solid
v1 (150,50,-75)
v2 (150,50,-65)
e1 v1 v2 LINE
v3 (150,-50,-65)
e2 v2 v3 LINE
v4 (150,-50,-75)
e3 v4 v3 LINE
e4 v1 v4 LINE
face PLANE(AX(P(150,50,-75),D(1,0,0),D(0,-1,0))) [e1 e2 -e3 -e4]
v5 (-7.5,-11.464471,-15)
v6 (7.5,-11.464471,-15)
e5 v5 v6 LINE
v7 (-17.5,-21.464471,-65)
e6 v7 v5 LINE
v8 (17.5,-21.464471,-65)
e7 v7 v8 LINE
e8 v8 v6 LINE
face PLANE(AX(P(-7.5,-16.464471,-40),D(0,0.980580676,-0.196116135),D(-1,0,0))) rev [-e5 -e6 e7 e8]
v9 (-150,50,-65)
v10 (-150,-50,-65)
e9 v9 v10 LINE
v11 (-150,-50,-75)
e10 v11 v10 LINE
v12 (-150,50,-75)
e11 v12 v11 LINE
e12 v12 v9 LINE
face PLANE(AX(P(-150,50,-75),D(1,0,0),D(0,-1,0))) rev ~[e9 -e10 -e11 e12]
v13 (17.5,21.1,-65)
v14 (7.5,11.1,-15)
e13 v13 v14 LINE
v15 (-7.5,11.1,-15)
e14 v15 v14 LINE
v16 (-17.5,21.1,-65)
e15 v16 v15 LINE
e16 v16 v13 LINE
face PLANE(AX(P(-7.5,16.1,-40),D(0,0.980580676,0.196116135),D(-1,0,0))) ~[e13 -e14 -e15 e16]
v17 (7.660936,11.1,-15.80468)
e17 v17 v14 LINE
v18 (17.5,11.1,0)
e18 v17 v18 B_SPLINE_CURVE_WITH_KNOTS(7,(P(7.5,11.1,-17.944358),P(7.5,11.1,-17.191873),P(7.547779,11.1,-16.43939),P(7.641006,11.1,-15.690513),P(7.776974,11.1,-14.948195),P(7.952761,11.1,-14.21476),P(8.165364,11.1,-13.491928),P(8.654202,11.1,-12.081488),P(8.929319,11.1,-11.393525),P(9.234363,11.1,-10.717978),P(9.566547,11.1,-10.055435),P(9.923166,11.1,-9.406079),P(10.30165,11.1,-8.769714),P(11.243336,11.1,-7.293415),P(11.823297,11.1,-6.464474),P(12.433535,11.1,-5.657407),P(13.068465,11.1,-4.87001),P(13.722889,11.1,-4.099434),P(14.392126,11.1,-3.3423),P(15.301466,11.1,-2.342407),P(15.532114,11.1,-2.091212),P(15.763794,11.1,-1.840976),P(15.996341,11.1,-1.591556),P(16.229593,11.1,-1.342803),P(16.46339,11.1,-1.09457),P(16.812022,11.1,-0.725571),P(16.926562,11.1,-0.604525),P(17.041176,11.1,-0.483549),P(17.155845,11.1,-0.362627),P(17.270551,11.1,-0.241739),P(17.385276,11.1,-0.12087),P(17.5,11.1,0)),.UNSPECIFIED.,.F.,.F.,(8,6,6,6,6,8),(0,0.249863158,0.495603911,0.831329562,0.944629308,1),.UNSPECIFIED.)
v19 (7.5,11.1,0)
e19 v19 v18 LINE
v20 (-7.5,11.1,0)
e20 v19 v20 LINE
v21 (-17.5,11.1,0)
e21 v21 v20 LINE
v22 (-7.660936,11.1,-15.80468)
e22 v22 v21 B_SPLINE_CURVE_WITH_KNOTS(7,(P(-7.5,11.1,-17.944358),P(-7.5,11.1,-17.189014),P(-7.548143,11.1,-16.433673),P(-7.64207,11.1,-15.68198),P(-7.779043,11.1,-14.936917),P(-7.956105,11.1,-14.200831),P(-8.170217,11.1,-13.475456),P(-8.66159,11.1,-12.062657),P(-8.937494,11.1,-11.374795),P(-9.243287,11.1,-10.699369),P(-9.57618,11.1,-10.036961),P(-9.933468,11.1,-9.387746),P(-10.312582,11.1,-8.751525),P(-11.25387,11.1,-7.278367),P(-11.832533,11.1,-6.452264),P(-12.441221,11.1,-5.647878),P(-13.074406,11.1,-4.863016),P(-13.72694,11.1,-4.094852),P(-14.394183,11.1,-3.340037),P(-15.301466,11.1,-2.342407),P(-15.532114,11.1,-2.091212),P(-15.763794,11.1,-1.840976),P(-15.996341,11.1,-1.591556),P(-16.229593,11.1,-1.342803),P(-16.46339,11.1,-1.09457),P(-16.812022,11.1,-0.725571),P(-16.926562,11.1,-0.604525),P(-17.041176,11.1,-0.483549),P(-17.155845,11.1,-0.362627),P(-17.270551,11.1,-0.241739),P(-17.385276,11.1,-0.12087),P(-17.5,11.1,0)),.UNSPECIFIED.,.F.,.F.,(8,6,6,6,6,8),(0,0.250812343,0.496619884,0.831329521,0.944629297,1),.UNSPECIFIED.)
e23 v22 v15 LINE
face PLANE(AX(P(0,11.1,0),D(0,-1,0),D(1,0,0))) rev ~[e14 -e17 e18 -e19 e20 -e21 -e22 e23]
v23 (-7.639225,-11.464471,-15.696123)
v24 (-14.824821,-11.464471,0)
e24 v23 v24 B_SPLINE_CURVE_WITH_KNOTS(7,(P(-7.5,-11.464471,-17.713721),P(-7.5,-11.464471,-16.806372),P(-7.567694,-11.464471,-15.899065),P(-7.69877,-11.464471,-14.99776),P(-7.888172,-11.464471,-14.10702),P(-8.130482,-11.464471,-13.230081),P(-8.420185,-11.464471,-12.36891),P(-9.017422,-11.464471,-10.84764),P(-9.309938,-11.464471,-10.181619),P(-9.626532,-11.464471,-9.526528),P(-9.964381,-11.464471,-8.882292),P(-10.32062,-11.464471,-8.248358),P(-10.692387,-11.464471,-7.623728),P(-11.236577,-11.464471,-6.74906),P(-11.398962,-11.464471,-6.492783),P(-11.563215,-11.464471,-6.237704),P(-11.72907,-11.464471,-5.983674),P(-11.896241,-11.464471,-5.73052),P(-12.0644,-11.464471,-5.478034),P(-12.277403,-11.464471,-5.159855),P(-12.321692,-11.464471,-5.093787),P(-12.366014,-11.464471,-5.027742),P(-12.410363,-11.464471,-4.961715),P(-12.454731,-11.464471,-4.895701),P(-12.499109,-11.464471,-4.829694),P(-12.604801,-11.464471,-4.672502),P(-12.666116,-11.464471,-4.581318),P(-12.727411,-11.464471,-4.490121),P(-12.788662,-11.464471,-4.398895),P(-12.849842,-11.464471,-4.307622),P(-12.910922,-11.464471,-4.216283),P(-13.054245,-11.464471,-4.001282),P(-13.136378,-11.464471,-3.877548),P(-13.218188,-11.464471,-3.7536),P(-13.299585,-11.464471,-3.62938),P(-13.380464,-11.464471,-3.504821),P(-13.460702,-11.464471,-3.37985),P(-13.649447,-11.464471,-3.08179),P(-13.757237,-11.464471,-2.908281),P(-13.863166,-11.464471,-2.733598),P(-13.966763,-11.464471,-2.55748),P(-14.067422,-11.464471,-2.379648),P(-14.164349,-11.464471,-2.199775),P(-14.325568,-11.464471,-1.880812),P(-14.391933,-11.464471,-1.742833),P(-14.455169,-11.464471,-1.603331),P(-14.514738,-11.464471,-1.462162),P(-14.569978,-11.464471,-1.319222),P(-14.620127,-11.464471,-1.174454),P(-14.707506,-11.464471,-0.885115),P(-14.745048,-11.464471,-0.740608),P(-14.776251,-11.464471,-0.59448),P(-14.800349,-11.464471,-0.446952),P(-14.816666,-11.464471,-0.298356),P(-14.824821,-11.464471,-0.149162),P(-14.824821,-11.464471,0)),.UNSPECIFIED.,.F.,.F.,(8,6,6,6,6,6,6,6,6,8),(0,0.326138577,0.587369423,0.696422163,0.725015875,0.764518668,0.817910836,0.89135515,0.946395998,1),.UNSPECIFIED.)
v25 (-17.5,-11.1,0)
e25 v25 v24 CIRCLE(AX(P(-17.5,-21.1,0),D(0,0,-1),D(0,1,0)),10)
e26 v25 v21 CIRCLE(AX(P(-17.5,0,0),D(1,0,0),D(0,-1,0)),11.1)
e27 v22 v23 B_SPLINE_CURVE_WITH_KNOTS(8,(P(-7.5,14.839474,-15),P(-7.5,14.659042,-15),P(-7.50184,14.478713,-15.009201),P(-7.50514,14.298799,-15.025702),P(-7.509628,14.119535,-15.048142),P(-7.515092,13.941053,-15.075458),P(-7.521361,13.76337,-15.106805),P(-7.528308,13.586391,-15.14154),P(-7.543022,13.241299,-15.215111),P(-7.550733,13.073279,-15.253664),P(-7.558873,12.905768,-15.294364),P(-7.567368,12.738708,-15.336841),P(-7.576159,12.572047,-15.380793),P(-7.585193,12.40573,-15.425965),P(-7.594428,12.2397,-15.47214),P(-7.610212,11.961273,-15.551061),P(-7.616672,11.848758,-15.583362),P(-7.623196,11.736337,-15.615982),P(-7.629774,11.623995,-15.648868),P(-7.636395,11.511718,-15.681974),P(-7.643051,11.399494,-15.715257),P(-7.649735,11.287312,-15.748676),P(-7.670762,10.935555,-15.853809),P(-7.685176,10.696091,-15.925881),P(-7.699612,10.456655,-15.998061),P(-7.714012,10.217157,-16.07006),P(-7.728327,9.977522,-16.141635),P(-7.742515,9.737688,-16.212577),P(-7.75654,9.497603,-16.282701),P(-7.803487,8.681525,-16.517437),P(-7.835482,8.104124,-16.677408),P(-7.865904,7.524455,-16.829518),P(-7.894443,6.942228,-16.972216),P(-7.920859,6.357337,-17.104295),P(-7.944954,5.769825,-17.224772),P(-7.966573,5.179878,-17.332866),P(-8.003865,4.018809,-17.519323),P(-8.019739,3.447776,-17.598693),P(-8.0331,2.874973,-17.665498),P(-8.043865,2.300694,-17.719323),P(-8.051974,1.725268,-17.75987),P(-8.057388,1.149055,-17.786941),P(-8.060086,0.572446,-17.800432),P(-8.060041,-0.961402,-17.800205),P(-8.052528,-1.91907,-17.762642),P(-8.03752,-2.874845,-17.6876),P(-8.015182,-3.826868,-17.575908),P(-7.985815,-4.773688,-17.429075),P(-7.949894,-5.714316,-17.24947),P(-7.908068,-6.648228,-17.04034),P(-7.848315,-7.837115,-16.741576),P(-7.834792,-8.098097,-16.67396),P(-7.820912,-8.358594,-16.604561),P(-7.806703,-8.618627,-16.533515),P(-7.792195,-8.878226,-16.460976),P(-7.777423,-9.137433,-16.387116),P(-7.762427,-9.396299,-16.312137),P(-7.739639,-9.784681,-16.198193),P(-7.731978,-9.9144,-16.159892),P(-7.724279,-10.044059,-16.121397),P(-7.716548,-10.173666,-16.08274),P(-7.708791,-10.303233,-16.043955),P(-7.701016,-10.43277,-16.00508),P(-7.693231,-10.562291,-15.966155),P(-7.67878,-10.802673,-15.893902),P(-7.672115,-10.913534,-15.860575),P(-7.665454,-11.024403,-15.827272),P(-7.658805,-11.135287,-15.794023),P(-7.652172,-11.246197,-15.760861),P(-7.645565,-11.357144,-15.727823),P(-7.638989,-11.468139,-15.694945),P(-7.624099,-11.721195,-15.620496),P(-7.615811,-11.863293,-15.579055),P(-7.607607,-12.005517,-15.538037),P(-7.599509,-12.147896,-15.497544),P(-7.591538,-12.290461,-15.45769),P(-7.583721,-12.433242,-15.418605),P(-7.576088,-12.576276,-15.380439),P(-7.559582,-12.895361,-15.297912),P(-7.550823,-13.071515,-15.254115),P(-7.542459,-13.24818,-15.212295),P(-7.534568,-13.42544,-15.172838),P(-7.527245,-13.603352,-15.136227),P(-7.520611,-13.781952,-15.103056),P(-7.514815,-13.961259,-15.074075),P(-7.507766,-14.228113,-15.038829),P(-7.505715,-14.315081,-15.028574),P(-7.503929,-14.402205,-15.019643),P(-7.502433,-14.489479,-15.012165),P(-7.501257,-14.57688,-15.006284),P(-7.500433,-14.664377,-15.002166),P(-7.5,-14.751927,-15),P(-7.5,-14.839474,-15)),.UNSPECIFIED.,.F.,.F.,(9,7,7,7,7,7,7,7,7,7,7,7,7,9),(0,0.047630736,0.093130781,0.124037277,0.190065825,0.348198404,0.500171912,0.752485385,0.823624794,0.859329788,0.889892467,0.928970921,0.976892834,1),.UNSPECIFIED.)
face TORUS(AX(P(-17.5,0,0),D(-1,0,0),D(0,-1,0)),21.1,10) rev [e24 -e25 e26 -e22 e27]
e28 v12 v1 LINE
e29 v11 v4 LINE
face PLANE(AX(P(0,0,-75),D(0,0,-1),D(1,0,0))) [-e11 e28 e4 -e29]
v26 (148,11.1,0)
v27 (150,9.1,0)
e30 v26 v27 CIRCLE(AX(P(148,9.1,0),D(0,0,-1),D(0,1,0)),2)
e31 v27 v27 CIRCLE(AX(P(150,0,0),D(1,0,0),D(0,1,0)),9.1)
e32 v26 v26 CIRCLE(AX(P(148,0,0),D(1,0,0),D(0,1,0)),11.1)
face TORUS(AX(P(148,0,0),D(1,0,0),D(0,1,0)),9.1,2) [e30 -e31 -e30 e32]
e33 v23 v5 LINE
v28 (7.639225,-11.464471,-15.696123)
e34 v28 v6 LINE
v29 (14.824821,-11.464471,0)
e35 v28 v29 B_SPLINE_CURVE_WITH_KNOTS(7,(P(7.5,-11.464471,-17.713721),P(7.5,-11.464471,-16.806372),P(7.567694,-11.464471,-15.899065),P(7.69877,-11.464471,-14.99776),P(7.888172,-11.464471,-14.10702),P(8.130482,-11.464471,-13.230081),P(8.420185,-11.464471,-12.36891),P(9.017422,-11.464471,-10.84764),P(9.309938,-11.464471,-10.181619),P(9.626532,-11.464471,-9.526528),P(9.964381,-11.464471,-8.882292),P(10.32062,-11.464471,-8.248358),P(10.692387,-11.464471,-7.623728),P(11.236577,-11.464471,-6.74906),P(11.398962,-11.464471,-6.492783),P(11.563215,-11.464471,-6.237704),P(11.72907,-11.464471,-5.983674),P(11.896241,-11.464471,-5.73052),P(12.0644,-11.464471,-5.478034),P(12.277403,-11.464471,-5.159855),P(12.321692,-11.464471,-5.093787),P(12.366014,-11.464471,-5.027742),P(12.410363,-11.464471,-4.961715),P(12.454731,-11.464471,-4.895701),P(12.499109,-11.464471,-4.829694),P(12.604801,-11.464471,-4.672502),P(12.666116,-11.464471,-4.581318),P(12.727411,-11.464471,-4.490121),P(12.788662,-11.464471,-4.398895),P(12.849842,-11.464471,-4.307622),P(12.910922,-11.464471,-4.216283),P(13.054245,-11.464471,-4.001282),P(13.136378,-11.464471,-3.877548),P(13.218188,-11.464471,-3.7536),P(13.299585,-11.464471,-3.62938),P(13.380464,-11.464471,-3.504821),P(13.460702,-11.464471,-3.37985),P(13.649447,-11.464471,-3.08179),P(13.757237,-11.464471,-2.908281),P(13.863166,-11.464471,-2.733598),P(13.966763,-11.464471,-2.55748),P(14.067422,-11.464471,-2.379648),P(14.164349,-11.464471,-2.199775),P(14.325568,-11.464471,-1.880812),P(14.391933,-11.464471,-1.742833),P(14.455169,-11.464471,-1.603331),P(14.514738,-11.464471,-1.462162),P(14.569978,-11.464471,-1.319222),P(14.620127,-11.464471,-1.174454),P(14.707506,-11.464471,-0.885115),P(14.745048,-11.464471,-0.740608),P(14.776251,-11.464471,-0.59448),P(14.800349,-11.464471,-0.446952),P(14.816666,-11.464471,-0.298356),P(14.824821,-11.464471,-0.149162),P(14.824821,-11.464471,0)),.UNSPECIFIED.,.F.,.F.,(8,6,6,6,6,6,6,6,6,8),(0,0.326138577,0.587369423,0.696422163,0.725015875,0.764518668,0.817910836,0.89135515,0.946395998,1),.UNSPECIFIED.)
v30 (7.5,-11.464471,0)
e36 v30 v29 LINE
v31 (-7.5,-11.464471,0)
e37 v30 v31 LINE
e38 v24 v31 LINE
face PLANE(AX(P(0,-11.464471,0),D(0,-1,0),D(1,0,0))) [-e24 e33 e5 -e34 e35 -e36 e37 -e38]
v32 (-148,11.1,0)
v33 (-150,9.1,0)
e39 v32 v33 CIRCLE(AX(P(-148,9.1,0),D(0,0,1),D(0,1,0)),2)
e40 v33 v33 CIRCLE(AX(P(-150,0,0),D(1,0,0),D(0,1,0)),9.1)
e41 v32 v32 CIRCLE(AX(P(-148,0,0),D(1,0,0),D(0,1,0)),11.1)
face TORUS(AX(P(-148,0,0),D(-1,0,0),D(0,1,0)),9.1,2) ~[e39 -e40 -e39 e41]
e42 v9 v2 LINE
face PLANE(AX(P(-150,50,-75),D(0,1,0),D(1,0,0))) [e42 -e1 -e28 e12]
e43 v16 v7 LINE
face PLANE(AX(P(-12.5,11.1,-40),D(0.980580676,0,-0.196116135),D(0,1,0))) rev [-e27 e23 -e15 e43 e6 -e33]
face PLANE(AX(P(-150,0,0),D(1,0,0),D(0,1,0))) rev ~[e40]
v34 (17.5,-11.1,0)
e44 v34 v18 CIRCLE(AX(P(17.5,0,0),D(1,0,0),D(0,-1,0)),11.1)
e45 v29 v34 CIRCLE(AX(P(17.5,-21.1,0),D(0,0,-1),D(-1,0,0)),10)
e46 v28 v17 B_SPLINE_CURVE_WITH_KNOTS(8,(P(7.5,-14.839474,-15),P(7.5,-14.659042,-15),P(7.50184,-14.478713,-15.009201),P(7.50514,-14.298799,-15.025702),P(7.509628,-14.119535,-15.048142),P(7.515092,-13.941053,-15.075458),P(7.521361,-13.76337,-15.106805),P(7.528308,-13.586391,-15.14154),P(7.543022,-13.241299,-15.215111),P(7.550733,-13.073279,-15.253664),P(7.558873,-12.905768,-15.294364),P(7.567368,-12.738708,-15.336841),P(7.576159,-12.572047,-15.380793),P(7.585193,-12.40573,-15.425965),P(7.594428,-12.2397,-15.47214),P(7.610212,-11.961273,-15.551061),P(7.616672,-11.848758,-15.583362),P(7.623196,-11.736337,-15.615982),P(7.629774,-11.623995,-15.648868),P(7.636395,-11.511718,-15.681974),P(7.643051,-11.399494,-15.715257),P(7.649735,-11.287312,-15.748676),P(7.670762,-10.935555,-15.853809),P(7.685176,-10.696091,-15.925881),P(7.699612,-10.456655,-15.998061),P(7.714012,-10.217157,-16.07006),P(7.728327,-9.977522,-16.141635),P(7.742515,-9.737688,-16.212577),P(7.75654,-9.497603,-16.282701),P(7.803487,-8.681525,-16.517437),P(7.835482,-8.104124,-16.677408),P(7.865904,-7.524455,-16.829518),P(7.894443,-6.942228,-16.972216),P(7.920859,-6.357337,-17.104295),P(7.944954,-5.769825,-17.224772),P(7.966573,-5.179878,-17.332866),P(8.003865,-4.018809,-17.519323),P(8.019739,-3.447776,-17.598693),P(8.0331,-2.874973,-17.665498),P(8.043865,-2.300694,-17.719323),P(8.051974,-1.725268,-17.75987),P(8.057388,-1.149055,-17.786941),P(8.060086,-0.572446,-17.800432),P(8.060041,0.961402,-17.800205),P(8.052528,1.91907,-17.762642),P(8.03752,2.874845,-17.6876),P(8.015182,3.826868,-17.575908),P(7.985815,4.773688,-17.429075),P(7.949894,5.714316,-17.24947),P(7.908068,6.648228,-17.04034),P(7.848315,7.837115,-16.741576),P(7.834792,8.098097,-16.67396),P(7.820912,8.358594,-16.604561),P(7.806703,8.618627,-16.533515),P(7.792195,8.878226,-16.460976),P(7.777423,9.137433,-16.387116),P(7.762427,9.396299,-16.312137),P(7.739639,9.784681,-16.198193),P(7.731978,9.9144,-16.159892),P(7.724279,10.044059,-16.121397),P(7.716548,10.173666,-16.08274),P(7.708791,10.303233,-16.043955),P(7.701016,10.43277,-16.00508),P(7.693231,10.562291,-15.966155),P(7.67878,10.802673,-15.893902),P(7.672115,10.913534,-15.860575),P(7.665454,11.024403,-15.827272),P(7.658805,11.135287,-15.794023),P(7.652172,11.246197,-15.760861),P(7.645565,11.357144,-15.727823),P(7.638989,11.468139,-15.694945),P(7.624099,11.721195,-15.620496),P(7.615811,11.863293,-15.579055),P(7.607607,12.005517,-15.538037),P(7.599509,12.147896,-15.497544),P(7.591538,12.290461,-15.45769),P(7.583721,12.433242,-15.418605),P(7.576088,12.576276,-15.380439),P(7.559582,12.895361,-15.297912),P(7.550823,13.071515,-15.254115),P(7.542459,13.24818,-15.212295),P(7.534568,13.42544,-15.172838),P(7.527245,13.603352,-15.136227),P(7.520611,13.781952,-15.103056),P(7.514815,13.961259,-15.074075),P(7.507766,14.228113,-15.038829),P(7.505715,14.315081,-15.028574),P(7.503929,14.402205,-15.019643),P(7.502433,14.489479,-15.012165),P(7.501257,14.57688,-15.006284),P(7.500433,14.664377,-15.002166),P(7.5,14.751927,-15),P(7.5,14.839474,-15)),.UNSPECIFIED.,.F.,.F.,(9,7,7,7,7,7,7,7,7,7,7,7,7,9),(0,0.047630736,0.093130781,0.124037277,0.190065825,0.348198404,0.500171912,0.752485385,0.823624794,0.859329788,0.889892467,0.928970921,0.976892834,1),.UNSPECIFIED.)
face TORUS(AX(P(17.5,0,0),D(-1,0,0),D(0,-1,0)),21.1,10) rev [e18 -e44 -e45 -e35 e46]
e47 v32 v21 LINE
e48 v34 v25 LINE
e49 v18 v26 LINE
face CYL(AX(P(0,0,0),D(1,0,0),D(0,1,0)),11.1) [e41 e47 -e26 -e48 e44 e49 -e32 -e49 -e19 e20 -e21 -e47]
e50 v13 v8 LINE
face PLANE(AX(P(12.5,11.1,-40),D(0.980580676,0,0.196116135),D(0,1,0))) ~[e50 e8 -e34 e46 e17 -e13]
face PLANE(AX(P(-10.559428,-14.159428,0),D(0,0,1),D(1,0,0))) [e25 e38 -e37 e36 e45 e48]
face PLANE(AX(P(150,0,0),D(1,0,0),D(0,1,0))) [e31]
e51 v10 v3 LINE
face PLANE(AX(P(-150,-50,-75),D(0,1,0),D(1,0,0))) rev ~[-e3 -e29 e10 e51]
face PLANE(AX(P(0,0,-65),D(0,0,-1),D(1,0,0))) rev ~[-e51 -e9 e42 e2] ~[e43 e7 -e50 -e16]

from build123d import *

# Parameters (mm, degrees)
F0_R         = 11.1
F1_DEPTH     = 150
F2_W         = 22.5644709975
F2_H         = 75
F4_DEPTH     = 7.5
F5_W         = 300
F5_H         = 100
F5_W_2       = 15
F5_H_2       = 22.5644709975
F7_DEPTH     = 10
F8_SIZE2     = 50
F8_SIZE      = 10
F9_T4_ANGLE  = 180
F9_T10_ANGLE = 180


# Not quite as in the source:
# - a fillet or chamfer that OpenCascade refuses, or shapes differently, is made with other operations: its cross-section is extruded or revolved along the edge and cut away or added


with BuildPart() as f1:
    # F0 (on Right) → F1 (new body, symmetric)
    with BuildSketch(Plane.YZ):
        Circle(F0_R)
    extrude(amount=F1_DEPTH, both=True)

    # F2 (on Right) → F4 (join, symmetric)
    with BuildSketch(Plane.YZ):
        with Locations((-0.1822354987, -37.5)):
            Rectangle(F2_W, F2_H)
    extrude(amount=F4_DEPTH, both=True)

    # F6: fillet of radius 2 on 2 edges, made by hand

    # F6_s1 → F6_t2 (revolve, cut)
    with BuildSketch(Plane.XY):
        with BuildLine():
            ThreePointArc((-148, 11.1), (-149.4142135624, 10.5142135624), (-150, 9.1))
            Line((-150, 9.1), (-150, 11.1))
            Line((-150, 11.1), (-148, 11.1))
        make_face()
    revolve(axis=Axis((-150, 0, 0), (1, 0, 0)), mode=Mode.SUBTRACT)

    # F6_s3 → F6_t4 (revolve, cut)
    with BuildSketch(Plane.XY):
        with BuildLine():
            ThreePointArc((148, 11.1), (149.4142135624, 10.5142135624), (150, 9.1))
            Line((150, 9.1), (150, 11.1))
            Line((150, 11.1), (148, 11.1))
        make_face()
    revolve(axis=Axis((150, 0, 0), (1, 0, 0)), mode=Mode.SUBTRACT)

    # F5 (on face) → F7 (join)
    with BuildSketch(Plane(origin=(0, 0, -75), x_dir=(1, 0, 0), z_dir=(0, 0, -1))):
        Rectangle(F5_W, F5_H)
        with Locations((0, 0.1822354987)):
            Rectangle(F5_W_2, F5_H_2, mode=Mode.SUBTRACT)
    extrude(amount=-F7_DEPTH)

    # F8
    f8_edges = [f1.edges().sort_by_distance(p)[0] for p in [
        (7.5, -0.182235, -65),
        (0, -11.464471, -65),
        (0, 11.1, -65),
        (-7.5, -0.182235, -65),
    ]]
    f8_side = f1.faces().sort_by_distance((146.837722, 0, -65))[0]
    chamfer(f8_edges, length=F8_SIZE, length2=F8_SIZE2, reference=f8_side)

    # F9: fillet of radius 10 on 2 edges, made by hand


with BuildPart() as f9_tool2:
    # F9_s3 → F9_t4 (revolve)
    with BuildSketch(Plane.XY):
        with BuildLine():
            ThreePointArc((7.5, -21.1), (10.4289321881, -14.0289321881), (17.5, -11.1))
            Line((17.5, -11.1), (7.5, -11.1))
            Line((7.5, -11.1), (7.5, -21.1))
        make_face()
    revolve(axis=Axis((7.5, 0, 0), (1, 0, 0)), revolution_arc=F9_T4_ANGLE)

    split(bisect_by=Plane.XZ.offset(-11.1), keep=Keep.TOP)

    split(bisect_by=Plane.XZ.offset(11.4644709975), keep=Keep.BOTTOM)


with BuildPart() as f1_1:
    add(f1.part)

    # F9_t1: union F9_tool2
    add(f9_tool2.part)


with BuildPart() as f9_tool8:
    # F9_s9 → F9_t10 (revolve)
    with BuildSketch(Plane.XY):
        with BuildLine():
            ThreePointArc((-17.5, -11.1), (-10.4289321881, -14.0289321881), (-7.5, -21.1))
            Line((-7.5, -21.1), (-7.5, -11.1))
            Line((-7.5, -11.1), (-17.5, -11.1))
        make_face()
    revolve(axis=Axis((-7.5, 0, 0), (1, 0, 0)), revolution_arc=F9_T10_ANGLE)

    split(bisect_by=Plane.XZ.offset(-11.1), keep=Keep.TOP)

    split(bisect_by=Plane.XZ.offset(11.4644709975), keep=Keep.BOTTOM)


with BuildPart() as f1_2:
    add(f1_1.part)

    # F9_t7: union F9_tool8
    add(f9_tool8.part)


solid = f1_2.part
